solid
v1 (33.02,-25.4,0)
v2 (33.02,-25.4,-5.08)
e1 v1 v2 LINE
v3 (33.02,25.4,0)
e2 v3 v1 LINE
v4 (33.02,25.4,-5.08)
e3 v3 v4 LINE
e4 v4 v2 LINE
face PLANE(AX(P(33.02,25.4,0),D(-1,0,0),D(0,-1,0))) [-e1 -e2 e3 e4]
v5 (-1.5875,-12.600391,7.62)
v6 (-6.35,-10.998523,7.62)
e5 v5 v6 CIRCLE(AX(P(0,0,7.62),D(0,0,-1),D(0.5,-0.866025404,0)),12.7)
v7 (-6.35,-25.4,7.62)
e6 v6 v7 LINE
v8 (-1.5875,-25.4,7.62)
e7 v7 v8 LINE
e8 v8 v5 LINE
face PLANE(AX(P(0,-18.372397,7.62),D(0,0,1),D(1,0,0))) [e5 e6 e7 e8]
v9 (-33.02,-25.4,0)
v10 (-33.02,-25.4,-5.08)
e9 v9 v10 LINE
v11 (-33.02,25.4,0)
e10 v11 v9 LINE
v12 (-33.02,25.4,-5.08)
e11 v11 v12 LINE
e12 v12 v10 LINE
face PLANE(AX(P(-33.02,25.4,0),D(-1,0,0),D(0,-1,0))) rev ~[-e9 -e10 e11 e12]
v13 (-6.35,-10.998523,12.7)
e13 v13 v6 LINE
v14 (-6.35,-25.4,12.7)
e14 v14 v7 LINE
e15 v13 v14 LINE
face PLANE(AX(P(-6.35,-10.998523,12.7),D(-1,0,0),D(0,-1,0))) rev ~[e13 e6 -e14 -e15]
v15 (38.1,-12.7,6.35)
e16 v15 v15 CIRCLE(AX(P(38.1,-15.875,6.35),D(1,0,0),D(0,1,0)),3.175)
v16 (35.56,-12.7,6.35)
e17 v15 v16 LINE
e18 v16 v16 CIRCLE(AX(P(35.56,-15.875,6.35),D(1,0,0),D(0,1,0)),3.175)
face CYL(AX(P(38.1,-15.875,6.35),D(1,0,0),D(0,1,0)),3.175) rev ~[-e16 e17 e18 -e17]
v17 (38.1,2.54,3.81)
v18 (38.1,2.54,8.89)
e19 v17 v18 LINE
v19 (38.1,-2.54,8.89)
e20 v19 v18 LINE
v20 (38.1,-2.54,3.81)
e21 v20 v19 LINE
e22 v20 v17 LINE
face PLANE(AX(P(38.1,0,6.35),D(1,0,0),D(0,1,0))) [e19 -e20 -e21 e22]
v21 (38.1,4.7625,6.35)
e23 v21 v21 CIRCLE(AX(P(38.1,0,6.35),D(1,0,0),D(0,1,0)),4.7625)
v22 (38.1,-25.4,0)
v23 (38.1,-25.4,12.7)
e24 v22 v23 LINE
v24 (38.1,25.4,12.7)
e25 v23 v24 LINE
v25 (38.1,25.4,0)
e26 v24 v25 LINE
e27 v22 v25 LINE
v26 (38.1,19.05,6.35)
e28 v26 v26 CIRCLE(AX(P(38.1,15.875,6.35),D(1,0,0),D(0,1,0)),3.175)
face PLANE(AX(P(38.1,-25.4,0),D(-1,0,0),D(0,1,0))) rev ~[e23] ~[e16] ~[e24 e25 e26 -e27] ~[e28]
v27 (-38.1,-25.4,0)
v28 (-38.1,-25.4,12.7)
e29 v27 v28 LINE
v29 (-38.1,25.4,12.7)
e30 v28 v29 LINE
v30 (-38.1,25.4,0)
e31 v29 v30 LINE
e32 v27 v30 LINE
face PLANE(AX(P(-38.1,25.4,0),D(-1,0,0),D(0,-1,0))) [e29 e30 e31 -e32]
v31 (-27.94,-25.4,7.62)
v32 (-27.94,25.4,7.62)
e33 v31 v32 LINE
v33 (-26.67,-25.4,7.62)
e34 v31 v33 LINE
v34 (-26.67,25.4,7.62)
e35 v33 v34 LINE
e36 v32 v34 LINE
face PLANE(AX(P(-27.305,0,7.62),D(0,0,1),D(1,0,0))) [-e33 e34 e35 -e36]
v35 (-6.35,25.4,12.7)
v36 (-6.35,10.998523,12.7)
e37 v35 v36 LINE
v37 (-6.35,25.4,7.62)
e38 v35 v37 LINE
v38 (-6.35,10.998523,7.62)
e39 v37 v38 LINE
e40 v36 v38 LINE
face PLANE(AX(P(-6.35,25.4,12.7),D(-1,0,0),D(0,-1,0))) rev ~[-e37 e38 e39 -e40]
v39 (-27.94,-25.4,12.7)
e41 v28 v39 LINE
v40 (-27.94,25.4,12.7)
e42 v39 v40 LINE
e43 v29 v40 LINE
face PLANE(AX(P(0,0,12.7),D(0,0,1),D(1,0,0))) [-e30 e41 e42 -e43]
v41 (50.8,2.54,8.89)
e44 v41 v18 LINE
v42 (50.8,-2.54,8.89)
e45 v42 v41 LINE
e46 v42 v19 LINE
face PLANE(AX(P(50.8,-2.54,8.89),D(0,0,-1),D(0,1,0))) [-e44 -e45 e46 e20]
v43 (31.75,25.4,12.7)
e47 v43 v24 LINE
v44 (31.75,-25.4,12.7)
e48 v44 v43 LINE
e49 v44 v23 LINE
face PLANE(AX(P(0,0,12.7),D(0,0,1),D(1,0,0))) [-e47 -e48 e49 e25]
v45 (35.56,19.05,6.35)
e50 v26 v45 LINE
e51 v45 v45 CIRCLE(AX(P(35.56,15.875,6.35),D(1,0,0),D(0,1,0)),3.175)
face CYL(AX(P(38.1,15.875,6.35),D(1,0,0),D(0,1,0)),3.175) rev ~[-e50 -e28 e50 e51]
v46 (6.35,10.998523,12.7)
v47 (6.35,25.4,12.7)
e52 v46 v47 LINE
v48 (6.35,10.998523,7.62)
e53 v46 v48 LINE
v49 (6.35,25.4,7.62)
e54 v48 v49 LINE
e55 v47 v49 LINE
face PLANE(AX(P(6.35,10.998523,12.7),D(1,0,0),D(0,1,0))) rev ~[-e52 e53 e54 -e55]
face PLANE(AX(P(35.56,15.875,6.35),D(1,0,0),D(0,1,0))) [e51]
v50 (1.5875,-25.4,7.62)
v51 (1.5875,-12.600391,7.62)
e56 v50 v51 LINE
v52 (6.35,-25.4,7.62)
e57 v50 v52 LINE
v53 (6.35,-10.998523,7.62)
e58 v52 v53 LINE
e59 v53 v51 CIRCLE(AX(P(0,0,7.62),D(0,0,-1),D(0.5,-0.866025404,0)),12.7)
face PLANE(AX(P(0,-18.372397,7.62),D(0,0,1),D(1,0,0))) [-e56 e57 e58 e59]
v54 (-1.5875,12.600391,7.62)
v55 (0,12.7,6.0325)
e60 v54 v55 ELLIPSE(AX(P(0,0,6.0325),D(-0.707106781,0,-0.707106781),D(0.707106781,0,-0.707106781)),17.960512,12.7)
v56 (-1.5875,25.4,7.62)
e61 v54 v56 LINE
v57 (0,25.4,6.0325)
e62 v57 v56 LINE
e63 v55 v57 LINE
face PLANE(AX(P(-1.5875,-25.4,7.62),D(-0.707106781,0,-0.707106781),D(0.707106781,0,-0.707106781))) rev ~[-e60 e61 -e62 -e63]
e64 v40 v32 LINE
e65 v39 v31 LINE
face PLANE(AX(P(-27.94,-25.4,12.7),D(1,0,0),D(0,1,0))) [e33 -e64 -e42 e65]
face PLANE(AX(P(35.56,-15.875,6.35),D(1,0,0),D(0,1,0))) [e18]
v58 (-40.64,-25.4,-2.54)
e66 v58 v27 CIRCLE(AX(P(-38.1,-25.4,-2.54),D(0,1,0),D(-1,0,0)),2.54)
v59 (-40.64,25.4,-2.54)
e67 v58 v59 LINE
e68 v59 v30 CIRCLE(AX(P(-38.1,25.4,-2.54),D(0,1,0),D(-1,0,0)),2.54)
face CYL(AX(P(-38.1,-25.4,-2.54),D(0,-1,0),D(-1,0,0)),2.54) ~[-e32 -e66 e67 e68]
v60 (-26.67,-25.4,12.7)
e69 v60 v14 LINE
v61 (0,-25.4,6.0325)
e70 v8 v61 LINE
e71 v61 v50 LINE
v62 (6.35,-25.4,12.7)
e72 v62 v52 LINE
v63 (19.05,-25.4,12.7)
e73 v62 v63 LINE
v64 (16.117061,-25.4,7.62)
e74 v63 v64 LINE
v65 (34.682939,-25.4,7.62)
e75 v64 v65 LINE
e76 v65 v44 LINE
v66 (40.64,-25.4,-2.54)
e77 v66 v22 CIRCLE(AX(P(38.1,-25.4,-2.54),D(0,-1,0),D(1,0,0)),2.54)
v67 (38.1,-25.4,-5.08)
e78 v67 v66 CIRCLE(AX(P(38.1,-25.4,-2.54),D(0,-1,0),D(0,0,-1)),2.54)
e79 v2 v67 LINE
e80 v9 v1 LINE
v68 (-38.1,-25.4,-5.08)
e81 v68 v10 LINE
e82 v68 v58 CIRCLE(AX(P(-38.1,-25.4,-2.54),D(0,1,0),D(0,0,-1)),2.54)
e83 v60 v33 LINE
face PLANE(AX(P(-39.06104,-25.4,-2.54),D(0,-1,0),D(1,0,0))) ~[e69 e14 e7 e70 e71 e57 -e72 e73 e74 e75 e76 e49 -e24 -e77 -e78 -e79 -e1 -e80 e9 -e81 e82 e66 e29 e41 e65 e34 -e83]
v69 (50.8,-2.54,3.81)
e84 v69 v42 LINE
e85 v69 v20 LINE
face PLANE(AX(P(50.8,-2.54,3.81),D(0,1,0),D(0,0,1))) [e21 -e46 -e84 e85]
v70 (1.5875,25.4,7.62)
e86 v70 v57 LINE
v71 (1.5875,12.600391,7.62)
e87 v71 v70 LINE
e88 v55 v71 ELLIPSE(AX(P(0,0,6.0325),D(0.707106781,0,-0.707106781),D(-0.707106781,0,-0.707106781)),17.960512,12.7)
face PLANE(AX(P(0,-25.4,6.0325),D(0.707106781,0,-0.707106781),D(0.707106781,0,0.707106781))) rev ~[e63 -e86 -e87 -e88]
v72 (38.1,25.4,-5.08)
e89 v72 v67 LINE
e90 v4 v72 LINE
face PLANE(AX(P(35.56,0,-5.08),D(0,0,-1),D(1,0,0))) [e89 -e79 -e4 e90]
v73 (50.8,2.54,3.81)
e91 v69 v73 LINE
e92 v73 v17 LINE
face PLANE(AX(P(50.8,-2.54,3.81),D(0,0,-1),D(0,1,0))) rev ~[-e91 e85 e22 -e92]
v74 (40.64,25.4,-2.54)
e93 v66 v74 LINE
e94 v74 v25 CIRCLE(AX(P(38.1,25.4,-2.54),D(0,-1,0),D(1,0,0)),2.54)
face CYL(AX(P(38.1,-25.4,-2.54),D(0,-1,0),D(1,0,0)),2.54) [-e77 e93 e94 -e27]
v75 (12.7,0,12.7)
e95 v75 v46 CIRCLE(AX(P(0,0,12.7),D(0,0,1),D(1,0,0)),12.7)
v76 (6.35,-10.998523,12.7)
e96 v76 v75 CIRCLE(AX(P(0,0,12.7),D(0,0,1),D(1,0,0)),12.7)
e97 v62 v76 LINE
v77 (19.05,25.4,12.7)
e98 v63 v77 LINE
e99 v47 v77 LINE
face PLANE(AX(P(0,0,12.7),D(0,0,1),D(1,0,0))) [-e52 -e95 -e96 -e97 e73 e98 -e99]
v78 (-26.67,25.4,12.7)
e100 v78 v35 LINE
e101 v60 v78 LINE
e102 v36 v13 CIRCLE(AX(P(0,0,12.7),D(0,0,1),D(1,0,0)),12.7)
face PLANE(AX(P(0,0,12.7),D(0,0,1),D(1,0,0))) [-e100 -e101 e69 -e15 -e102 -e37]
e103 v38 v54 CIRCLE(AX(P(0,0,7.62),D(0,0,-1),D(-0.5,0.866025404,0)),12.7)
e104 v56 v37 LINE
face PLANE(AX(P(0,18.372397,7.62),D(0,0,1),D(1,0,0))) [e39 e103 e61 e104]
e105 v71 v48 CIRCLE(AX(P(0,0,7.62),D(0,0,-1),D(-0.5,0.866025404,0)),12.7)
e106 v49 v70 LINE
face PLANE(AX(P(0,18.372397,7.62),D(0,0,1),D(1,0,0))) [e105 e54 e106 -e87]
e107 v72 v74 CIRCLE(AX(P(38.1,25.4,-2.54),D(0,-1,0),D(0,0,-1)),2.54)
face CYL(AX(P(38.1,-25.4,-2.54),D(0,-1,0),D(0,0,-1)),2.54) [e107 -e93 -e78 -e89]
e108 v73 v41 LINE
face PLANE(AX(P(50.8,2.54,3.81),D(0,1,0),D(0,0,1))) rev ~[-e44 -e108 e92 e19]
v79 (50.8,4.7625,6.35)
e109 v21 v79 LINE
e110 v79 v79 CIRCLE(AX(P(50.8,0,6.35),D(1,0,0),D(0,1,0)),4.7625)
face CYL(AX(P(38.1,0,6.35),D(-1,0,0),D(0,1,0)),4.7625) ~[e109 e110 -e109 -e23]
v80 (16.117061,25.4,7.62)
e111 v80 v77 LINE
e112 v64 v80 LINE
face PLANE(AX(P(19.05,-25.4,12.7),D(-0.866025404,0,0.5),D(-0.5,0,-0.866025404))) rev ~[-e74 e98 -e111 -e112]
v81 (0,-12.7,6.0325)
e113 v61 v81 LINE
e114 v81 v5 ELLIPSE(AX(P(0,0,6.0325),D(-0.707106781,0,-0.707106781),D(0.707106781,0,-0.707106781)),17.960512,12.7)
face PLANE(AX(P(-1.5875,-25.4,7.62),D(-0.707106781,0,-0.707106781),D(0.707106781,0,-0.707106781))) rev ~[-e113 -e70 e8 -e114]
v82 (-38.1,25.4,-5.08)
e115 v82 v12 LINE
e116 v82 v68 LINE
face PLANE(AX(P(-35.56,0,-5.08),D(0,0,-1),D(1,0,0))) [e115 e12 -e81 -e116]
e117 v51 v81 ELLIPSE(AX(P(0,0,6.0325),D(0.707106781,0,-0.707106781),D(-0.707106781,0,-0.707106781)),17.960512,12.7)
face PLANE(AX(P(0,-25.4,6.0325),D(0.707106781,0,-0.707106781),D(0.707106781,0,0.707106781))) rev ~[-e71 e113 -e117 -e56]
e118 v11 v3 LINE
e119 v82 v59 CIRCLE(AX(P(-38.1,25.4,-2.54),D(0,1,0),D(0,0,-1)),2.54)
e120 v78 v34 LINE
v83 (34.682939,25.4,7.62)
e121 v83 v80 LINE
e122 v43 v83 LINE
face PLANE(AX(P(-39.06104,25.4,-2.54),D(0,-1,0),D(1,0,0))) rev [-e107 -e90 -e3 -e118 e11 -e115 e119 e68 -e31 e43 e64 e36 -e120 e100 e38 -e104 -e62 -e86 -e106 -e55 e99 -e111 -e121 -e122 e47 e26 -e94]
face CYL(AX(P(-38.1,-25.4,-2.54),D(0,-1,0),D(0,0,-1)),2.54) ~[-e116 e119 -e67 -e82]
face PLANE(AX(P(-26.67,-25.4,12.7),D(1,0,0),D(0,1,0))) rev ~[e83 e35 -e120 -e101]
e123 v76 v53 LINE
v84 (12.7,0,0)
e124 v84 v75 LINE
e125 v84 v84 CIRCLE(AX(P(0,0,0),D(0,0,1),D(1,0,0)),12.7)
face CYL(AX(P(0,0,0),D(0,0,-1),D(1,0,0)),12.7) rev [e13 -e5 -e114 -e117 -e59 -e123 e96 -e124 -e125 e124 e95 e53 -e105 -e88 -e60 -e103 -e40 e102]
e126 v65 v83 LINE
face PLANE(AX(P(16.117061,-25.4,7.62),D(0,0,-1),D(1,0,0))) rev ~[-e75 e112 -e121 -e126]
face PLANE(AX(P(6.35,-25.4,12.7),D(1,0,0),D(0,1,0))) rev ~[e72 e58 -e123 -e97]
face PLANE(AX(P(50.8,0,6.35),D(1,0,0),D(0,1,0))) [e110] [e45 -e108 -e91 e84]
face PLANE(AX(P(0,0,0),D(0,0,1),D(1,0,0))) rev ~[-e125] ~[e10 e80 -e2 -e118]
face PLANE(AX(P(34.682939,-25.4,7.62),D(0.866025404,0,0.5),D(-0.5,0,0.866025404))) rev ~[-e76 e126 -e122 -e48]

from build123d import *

# Parameters (mm, degrees)
F0_W      = 76.2
F0_H      = 50.8
F0_R      = 12.7
F1_DEPTH  = 12.7
F2_W      = 1.27
F2_H      = 50.8
F3_DEPTH  = 5.08
F5_DEPTH  = 50.801
F6_R      = 4.7625
F7_DEPTH  = 12.7
F8_W      = 5.08
F8_H      = 50.8
F9_DEPTH  = 5.08
F10_W     = 5.08
F10_H     = 5.08
F11_DEPTH = 12.7
F13_DEPTH = 50.8
F14_R     = 3.175
F15_DEPTH = 2.54
F17_DEPTH = 50.801


# Not quite as in the source:
# - a pattern or mirror of a feature is missing from the dataset's text; its kind, count and spacing are read off the source's solid


with BuildPart() as f1:
    # F0 (on Top) → F1 (new body)
    with BuildSketch(Plane.XY):
        Rectangle(F0_W, F0_H)
        Circle(F0_R, mode=Mode.SUBTRACT)
    extrude(amount=F1_DEPTH)

    # F2 (on face) → F3 (cut)
    with BuildSketch(Plane.XY.offset(12.7)):
        with Locations((-27.305, 0)):
            Rectangle(F2_W, F2_H)
        with BuildLine():
            Line((-6.35, -10.9985226281), (-6.35, -25.4))
            Line((-6.35, -25.4), (6.35, -25.4))
            Line((6.35, -25.4), (6.35, -10.9985226281))
            ThreePointArc((6.35, -10.9985226281), (0, -12.7), (-6.35, -10.9985226281))
        make_face()
        with BuildLine():
            Line((6.35, 25.4), (-6.35, 25.4))
            Line((-6.35, 25.4), (-6.35, 10.9985226281))
            ThreePointArc((-6.35, 10.9985226281), (0, 12.7), (6.35, 10.9985226281))
            Line((6.35, 10.9985226281), (6.35, 25.4))
        make_face()
    extrude(amount=-F3_DEPTH, mode=Mode.SUBTRACT)

    # F4 (on face) → F5 (cut, through all)
    with BuildSketch(Plane.XZ.offset(25.4)):
        Polygon((31.75, 12.7), (19.05, 12.7), (16.1170606325, 7.62), (34.6829393675, 7.62), align=None)
    extrude(amount=-F5_DEPTH, mode=Mode.SUBTRACT)

    # F6 (on face) → F7 (join)
    with BuildSketch(Plane.YZ.offset(38.1)):
        with Locations((0, 6.35)):
            Circle(F6_R)
    extrude(amount=F7_DEPTH)

    # F8 (on face) → F9 (join)
    with BuildSketch(Plane(origin=(0, 0, 0), x_dir=(1, 0, 0), z_dir=(0, 0, -1))):
        with Locations((-35.56, 0)):
            Rectangle(F8_W, F8_H)
        with Locations((35.56, 0)):
            Rectangle(F8_W, F8_H)
    extrude(amount=F9_DEPTH)

    # F10 (on face) → F11 (cut)
    with BuildSketch(Plane.YZ.offset(50.8)):
        with Locations((0, 6.35)):
            Rectangle(F10_W, F10_H)
    extrude(amount=-F11_DEPTH, mode=Mode.SUBTRACT)

    # F12 (on face) → F13 (join, through all)
    with BuildSketch(Plane.XZ.offset(25.4)):
        with BuildLine():
            ThreePointArc((38.1, -5.08), (39.8960512242, -4.3360512242), (40.64, -2.54))
            ThreePointArc((40.64, -2.54), (39.8960512242, -0.7439487758), (38.1, 0))
            Line((38.1, 0), (38.1, -5.08))
        make_face()
        with BuildLine():
            Line((38.1, -5.08), (38.1, 0))
            ThreePointArc((38.1, 0), (35.56, -2.54), (38.1, -5.08))
        make_face()
    f13 = extrude(amount=-F13_DEPTH)

    # F13_copies: F13 across plane
    add(f13.mirror(Plane(origin=(0, 0, 0), x_dir=(0, 0, -1), z_dir=(-1, 0, 0))))

    # F14 (on face) → F15 (cut)
    with BuildSketch(Plane.YZ.offset(38.1)):
        with Locations((-15.875, 6.35)):
            Circle(F14_R)
        with Locations((15.875, 6.35)):
            Circle(F14_R)
    extrude(amount=-F15_DEPTH, mode=Mode.SUBTRACT)

    # F16 (on face) → F17 (cut, through all)
    with BuildSketch(Plane.XZ.offset(25.4)):
        Polygon((-1.5875, 7.62), (0, 6.0325), (1.5875, 7.62), align=None)
    extrude(amount=-F17_DEPTH, mode=Mode.SUBTRACT)


solid = f1.part
